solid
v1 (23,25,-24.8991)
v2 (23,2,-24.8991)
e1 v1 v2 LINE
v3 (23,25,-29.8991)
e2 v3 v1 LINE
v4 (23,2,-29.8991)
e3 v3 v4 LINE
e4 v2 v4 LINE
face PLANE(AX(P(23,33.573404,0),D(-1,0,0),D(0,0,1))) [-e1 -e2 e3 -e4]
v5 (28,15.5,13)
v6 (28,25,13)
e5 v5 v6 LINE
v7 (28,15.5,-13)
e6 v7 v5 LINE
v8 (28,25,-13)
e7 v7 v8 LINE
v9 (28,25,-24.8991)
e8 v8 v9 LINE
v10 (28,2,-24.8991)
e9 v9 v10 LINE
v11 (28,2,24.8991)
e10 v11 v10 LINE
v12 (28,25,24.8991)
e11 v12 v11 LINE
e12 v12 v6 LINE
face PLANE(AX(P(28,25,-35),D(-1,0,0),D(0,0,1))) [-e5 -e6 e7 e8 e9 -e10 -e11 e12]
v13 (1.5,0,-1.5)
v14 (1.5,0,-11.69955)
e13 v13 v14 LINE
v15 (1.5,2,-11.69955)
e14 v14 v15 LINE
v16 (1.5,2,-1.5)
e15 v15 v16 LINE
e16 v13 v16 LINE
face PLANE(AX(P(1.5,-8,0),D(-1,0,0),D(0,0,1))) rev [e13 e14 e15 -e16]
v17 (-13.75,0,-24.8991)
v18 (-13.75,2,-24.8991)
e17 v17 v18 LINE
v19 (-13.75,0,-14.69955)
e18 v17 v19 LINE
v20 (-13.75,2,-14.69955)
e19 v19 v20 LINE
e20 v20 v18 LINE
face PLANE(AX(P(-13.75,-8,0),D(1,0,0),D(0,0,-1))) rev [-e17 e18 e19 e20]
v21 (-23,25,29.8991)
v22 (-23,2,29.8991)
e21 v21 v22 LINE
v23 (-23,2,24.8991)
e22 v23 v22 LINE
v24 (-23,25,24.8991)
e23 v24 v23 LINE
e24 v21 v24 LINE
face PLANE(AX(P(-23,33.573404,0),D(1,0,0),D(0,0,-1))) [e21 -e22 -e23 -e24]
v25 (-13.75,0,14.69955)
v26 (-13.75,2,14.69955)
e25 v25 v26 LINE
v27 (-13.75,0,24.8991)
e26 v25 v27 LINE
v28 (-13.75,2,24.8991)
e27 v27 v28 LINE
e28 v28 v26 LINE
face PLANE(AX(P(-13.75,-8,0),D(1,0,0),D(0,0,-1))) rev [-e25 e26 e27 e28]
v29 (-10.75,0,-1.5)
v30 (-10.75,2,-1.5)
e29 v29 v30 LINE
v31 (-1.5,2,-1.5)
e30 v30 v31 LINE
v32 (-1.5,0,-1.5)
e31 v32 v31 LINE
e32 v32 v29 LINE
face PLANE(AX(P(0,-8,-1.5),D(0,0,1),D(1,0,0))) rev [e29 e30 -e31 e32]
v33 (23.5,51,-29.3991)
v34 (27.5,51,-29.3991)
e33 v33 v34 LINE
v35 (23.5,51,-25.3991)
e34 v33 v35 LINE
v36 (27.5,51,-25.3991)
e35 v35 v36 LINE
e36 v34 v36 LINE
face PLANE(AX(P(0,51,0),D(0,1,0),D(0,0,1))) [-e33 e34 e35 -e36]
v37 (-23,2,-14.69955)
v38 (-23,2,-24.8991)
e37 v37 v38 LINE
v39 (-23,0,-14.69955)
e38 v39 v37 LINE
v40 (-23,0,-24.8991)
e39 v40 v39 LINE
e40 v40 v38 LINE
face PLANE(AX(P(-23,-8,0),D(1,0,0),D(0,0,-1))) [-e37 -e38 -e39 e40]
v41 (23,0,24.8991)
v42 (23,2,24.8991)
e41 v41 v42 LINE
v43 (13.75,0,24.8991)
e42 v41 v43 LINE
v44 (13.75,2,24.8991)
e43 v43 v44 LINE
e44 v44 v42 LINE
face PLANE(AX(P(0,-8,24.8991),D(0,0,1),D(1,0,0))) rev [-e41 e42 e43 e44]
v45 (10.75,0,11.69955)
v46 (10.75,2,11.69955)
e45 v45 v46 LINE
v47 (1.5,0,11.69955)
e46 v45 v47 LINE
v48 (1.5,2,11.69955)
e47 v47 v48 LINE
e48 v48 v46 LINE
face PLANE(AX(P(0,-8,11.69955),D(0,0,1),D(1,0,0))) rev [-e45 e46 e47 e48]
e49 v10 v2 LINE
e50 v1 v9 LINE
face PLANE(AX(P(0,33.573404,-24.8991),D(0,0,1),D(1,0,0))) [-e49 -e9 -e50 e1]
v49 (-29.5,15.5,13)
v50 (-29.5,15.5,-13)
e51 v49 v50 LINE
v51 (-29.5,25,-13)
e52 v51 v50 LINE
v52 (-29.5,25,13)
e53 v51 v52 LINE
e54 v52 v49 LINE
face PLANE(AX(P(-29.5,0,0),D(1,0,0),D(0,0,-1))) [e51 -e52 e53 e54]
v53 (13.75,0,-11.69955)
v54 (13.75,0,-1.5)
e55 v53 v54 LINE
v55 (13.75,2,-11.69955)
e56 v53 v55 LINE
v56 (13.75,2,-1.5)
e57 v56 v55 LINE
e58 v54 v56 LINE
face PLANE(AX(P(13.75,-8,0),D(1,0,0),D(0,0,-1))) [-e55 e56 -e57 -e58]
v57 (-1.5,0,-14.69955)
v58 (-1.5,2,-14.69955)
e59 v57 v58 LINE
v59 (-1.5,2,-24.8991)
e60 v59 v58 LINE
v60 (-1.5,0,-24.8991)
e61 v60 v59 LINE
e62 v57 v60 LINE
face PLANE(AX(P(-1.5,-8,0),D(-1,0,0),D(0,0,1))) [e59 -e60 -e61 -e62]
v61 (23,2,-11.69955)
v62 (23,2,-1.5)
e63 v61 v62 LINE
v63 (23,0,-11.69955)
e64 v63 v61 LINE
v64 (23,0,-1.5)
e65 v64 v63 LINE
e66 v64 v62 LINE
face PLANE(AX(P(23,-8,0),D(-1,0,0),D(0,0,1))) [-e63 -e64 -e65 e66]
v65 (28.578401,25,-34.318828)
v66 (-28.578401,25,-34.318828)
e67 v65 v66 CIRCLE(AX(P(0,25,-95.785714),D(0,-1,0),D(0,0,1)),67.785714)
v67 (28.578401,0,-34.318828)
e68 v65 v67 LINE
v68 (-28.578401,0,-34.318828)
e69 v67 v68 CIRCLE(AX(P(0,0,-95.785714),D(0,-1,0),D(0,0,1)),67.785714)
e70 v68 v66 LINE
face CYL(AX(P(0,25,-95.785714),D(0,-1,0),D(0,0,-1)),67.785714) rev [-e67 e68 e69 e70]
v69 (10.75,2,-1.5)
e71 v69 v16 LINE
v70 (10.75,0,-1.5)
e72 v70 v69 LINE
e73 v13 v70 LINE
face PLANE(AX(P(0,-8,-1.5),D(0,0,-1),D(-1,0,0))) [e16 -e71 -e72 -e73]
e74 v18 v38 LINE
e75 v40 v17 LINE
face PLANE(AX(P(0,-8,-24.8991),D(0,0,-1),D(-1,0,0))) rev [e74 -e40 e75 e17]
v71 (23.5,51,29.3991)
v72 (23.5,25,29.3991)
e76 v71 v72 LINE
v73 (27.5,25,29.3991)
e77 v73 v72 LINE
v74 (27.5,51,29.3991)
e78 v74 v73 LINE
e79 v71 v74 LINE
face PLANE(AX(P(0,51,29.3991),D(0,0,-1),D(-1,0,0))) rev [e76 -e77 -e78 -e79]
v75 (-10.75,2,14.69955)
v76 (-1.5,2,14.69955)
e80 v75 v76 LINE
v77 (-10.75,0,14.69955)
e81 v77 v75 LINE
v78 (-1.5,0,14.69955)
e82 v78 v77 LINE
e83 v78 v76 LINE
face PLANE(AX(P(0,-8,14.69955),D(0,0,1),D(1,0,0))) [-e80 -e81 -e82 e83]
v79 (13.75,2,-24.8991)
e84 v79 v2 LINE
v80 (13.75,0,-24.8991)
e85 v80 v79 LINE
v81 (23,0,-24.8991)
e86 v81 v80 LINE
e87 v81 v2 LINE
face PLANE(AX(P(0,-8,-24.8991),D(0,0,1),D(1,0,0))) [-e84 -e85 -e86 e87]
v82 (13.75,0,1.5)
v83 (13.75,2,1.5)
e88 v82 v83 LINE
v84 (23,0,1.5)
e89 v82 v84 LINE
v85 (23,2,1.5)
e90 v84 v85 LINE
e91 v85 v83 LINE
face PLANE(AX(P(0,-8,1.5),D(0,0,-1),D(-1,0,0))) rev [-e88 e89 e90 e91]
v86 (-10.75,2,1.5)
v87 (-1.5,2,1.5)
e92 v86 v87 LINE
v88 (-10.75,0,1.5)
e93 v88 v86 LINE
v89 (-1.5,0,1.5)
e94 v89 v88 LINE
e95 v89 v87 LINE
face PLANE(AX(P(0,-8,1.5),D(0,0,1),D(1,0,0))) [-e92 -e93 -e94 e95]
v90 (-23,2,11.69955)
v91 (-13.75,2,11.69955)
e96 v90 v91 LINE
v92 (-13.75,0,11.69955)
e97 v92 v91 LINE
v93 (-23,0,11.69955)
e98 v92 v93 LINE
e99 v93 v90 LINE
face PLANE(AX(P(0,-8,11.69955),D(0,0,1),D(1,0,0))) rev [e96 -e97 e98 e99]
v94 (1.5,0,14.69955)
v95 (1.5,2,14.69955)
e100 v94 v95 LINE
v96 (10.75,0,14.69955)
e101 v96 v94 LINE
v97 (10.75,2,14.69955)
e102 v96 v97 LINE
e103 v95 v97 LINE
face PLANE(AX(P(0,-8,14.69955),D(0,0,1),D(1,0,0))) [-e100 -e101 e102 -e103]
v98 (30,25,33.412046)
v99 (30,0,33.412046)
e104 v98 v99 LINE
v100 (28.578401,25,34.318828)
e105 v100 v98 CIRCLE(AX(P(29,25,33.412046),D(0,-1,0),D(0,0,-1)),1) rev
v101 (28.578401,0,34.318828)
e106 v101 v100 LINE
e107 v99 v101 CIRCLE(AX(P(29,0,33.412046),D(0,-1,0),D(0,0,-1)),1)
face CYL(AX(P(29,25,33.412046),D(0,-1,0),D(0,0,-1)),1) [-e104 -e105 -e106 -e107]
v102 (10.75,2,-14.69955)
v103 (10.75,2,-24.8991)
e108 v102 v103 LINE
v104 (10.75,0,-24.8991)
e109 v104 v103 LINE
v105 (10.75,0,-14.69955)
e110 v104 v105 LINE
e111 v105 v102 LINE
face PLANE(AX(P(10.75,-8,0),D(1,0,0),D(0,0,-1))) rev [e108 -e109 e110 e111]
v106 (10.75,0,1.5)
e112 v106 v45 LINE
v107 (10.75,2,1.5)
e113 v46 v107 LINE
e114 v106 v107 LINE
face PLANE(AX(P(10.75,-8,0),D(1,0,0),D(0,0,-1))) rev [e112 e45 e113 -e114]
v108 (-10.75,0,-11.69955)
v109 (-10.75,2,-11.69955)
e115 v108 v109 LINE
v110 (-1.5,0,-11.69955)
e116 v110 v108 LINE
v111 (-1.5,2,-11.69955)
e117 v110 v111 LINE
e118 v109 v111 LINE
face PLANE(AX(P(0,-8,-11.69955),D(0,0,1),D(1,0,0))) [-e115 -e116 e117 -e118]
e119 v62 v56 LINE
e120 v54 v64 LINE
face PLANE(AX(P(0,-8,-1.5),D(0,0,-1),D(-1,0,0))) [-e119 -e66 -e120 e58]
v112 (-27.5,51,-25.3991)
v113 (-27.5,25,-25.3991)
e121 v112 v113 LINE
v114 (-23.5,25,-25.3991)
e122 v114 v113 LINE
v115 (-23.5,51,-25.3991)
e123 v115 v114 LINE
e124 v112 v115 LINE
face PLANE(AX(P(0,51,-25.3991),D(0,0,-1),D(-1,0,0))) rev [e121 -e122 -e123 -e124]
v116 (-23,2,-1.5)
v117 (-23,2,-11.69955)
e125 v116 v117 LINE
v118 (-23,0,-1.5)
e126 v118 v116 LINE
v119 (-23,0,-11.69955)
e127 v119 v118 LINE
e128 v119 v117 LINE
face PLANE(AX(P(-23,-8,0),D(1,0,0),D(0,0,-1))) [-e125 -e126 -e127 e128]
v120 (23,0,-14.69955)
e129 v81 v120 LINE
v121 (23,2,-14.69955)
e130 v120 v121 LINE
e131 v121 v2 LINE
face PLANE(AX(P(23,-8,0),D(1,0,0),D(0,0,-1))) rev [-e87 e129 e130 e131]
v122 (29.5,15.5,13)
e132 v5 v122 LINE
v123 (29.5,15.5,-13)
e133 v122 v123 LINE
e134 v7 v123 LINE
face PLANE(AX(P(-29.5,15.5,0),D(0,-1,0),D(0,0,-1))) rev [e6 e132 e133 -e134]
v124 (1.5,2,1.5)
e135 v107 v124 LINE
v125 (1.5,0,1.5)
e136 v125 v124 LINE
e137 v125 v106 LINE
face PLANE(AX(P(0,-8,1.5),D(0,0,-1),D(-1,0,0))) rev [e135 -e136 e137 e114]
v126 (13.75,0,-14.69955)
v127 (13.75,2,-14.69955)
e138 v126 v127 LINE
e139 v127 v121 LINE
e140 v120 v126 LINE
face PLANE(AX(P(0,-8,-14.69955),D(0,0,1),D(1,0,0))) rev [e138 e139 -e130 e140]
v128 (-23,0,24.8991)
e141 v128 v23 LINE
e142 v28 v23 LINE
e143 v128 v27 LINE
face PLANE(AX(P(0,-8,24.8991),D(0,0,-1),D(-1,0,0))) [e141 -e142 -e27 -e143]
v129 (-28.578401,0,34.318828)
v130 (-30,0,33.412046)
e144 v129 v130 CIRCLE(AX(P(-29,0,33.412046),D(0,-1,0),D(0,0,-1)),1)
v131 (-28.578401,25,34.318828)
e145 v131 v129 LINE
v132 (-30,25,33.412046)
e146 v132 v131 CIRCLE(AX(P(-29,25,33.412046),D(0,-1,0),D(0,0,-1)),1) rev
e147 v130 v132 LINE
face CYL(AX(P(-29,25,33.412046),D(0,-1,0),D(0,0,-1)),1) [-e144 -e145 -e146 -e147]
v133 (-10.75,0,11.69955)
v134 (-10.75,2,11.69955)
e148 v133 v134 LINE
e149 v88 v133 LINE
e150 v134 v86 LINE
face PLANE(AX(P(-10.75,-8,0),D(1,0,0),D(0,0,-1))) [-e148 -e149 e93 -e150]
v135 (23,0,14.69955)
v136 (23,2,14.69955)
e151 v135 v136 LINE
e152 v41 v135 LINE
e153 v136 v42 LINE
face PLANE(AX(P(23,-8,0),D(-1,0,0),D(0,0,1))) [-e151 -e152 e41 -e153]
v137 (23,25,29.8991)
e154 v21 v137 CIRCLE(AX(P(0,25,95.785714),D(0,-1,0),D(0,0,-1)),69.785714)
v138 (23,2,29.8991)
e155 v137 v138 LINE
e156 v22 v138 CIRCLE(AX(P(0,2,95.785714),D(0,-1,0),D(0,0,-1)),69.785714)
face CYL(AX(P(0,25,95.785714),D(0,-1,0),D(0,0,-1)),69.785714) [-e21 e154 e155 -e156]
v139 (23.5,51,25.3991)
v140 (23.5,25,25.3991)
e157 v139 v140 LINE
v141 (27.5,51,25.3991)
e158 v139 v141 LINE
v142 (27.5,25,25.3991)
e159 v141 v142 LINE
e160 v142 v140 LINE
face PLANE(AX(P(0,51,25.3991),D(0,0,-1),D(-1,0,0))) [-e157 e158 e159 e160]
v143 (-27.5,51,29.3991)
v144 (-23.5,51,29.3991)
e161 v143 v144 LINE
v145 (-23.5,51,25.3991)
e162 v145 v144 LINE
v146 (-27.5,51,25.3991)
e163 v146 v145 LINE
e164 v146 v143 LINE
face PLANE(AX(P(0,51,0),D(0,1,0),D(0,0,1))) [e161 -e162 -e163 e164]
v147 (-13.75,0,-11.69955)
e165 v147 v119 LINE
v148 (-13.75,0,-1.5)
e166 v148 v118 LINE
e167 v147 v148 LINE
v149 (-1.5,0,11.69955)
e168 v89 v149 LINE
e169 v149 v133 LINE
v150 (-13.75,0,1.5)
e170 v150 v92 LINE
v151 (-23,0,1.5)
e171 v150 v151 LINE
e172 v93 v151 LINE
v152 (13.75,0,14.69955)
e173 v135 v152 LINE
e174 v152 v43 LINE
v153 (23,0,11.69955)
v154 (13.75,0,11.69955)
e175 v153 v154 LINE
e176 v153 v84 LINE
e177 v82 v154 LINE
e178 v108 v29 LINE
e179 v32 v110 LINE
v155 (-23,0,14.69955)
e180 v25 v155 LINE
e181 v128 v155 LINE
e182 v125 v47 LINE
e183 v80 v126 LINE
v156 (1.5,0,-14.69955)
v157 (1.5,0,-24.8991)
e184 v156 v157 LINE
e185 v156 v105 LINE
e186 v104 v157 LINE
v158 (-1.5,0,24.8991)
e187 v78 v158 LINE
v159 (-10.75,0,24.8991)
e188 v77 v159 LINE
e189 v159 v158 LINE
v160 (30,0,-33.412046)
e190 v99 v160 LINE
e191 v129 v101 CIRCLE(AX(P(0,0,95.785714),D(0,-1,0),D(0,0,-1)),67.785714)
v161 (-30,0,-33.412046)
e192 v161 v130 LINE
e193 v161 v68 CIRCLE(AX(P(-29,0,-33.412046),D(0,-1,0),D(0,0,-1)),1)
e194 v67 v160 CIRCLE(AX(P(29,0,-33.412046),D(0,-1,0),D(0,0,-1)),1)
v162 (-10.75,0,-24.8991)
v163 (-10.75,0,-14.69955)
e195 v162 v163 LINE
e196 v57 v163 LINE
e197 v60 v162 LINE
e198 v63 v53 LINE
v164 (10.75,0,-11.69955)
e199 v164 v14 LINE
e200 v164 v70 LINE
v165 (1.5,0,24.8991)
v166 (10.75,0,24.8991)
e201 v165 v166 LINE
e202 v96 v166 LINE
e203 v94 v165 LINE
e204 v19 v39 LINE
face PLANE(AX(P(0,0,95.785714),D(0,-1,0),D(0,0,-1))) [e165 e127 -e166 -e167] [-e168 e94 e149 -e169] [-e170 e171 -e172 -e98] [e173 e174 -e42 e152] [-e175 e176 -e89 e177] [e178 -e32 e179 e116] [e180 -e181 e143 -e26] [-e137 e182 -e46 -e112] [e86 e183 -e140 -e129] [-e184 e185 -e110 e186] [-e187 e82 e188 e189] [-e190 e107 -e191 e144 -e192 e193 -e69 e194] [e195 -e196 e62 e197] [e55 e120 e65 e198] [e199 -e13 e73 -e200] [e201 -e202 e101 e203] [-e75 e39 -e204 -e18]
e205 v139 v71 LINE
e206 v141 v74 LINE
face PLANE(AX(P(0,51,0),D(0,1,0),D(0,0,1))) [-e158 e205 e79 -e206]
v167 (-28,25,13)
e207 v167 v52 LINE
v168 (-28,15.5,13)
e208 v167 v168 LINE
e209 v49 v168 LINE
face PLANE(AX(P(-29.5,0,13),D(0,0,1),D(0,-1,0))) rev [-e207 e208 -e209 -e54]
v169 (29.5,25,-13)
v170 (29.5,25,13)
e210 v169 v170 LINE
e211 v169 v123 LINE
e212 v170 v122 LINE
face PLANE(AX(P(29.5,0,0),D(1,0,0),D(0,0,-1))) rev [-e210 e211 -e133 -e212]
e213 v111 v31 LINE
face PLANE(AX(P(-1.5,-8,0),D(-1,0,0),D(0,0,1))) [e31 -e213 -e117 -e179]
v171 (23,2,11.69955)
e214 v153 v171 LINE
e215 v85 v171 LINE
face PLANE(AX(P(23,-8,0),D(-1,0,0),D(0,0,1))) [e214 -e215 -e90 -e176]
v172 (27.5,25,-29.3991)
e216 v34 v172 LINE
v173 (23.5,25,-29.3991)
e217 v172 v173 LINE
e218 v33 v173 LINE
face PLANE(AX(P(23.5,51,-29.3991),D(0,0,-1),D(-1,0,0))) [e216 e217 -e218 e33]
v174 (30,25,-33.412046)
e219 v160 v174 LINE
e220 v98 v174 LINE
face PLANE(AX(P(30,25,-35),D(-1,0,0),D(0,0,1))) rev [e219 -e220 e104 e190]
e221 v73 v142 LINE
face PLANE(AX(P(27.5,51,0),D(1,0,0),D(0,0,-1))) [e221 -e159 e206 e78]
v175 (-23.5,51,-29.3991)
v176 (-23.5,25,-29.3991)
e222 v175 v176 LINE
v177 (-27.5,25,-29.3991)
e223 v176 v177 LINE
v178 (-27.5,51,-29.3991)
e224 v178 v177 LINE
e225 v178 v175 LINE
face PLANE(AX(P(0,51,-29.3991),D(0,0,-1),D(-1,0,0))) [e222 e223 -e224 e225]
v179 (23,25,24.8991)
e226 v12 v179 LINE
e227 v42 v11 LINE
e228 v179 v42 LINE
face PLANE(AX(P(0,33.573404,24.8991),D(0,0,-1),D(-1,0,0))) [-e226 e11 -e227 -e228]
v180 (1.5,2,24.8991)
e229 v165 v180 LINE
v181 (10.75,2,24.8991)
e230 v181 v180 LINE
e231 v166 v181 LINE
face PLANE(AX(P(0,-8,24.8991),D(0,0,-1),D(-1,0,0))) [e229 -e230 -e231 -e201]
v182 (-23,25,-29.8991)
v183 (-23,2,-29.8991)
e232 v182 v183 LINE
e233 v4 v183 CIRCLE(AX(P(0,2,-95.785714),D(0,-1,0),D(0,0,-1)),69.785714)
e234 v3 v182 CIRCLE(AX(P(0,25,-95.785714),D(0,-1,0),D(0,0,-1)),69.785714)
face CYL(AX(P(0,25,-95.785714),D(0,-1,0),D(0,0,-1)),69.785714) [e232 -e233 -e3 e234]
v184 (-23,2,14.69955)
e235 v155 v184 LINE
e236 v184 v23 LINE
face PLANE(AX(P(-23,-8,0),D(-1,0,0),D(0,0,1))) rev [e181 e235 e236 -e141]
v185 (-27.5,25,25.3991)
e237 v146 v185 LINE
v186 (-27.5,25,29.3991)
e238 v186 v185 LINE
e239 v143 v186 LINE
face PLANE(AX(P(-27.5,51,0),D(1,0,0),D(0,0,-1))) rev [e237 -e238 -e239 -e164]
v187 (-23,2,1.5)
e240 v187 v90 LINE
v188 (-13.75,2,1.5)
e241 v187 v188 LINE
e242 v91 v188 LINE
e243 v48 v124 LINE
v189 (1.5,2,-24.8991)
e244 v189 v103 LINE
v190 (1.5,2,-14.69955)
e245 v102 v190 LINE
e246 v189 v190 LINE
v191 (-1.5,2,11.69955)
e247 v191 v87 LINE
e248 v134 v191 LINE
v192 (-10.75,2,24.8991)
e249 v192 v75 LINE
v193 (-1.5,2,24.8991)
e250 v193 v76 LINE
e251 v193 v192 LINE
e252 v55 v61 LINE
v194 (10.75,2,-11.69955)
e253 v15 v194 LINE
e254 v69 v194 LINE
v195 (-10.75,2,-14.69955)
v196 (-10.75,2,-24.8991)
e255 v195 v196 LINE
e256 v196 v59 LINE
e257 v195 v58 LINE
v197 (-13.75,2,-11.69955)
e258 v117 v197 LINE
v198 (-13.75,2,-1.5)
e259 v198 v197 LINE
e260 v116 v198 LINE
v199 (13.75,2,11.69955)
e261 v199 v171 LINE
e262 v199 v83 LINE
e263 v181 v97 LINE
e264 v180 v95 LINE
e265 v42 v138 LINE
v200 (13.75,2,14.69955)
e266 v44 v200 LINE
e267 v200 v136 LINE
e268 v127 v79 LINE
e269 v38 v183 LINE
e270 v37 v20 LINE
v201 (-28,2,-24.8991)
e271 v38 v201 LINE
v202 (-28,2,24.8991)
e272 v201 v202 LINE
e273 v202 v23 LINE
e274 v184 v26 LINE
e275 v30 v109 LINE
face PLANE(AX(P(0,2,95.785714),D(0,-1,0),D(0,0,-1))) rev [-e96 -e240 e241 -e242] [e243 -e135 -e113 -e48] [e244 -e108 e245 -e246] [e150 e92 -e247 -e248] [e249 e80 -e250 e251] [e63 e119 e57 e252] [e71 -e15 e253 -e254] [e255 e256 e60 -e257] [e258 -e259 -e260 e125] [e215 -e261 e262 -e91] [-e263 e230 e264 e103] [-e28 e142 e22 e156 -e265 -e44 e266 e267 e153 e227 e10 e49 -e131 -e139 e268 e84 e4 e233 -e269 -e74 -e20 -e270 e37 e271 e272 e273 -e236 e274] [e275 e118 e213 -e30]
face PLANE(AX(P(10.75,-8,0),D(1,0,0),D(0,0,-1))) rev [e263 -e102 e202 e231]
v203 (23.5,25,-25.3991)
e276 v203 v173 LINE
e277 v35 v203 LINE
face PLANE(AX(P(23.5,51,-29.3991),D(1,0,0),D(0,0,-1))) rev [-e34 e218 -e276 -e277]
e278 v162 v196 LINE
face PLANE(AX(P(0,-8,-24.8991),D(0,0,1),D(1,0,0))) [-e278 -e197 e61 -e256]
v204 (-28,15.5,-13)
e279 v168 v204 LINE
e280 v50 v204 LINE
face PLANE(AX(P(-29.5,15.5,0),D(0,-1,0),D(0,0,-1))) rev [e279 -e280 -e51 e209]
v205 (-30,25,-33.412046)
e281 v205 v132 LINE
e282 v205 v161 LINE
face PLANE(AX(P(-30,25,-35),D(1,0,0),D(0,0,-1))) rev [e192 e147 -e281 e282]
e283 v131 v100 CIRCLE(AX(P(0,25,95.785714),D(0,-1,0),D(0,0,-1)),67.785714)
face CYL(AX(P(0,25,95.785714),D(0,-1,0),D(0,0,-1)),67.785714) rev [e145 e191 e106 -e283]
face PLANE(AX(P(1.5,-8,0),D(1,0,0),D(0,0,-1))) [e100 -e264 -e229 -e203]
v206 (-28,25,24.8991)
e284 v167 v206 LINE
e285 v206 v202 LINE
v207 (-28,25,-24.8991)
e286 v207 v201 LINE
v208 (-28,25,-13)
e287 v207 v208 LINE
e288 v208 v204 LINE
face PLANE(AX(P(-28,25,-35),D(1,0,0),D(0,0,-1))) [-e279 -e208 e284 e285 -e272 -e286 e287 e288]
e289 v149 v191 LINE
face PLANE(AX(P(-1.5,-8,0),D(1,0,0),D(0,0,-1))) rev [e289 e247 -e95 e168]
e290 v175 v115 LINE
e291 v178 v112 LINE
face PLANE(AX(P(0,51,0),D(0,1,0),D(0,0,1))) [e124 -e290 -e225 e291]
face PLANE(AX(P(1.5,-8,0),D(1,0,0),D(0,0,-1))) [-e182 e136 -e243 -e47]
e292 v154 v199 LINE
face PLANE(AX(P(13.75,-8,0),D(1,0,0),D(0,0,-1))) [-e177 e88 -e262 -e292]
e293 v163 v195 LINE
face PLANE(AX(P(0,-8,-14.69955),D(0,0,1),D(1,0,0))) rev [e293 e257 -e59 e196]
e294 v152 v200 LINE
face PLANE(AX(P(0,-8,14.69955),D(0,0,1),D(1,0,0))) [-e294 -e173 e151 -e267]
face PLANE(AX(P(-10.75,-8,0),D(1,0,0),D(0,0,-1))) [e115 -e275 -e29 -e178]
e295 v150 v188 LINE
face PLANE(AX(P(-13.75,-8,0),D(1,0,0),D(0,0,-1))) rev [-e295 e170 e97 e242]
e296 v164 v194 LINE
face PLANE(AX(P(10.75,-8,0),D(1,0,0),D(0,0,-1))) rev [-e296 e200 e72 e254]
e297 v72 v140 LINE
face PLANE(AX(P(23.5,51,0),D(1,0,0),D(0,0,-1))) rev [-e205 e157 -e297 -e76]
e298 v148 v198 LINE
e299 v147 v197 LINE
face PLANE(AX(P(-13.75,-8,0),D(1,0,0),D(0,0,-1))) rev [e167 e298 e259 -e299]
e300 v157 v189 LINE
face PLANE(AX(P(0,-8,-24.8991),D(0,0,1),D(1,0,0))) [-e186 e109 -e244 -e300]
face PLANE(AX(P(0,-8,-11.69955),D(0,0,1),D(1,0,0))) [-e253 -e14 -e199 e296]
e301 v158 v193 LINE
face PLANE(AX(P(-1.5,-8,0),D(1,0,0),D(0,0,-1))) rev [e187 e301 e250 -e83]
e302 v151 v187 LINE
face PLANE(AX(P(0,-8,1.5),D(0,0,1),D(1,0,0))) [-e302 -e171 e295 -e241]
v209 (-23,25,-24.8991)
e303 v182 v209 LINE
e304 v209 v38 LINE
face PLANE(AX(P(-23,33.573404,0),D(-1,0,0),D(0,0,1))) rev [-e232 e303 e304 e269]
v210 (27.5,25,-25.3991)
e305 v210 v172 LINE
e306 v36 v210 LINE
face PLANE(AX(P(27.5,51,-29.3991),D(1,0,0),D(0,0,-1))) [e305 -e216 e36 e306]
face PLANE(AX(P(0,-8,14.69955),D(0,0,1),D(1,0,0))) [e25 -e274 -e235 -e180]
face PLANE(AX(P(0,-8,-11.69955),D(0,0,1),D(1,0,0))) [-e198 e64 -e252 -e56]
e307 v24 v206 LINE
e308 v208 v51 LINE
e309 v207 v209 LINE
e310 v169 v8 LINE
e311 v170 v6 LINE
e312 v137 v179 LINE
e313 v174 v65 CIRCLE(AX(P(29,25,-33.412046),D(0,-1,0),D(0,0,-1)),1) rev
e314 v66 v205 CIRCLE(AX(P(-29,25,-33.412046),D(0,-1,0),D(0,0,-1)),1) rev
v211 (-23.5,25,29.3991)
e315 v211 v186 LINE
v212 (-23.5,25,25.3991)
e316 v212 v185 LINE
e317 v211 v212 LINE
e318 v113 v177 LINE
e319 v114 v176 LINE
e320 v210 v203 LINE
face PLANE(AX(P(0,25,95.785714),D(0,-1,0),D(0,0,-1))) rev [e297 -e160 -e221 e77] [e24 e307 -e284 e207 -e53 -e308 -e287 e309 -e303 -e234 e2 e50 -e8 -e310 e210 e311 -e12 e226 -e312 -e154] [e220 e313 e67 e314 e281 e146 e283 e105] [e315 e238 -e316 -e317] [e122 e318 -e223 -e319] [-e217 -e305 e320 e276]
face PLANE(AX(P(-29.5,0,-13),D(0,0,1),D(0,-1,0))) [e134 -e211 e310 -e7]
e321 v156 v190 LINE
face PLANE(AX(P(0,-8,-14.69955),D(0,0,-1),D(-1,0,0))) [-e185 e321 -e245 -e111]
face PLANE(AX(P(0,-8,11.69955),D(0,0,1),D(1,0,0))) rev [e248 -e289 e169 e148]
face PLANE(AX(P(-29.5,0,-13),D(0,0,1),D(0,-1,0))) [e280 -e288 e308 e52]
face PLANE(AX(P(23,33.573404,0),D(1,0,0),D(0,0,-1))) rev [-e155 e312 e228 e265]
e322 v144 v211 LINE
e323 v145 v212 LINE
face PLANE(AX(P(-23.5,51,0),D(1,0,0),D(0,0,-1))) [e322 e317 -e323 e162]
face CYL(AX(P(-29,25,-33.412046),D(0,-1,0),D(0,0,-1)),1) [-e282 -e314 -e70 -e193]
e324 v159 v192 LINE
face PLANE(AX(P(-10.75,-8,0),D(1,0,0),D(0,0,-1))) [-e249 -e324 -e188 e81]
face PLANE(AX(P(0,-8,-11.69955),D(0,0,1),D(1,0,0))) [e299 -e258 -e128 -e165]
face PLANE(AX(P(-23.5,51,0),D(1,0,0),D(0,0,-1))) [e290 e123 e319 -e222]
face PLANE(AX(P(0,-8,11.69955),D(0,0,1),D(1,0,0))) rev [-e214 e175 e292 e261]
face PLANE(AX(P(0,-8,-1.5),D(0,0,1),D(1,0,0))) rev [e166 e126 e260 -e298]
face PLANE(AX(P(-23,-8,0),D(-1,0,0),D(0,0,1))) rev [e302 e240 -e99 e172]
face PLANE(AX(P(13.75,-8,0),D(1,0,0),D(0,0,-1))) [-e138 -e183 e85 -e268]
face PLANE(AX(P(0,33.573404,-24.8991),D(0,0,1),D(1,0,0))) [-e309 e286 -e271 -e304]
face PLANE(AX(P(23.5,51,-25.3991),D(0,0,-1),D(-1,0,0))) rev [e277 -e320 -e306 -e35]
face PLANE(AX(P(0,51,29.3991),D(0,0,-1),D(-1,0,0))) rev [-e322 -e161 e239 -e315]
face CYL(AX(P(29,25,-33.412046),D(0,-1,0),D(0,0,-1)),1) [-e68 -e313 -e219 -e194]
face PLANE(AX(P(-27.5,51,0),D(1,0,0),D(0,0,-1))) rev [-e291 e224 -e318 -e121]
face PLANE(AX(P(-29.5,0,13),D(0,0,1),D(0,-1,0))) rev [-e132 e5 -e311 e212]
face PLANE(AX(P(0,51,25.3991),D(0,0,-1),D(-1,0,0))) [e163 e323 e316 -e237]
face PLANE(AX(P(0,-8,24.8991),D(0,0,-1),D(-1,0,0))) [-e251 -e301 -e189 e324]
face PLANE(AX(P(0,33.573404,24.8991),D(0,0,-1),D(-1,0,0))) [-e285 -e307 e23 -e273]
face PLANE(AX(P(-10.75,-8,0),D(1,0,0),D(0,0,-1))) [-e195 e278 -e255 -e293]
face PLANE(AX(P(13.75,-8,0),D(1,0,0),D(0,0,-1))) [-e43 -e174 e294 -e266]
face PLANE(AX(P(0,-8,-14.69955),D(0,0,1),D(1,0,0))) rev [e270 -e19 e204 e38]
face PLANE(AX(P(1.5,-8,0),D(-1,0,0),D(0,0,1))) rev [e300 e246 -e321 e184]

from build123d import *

# Parameters (mm, degrees)
RESSALTO_EXTRUS_O1_DEPTH = 25
CASCA1_T                 = -2
ESBO_O3_W                = 4
ESBO_O3_H                = 4
RESSALTO_EXTRUS_O2_DEPTH = 23
ESBO_O3_3_W              = 4
ESBO_O3_3_H              = 4
RESSALTO_EXTRUS_O3_DEPTH = 49
FILETE1_R                = 1
CORTE_EXTRUS_O1_START    = -0.5
ESBO_O4_W                = 26
ESBO_O4_H                = 9.5
ESBO_O4_H_2              = 3.5
CORTE_EXTRUS_O1_DEPTH    = 59
ESBO_O5_W                = 9.25
ESBO_O5_H                = 10.19955009
CORTE_EXTRUS_O2_DEPTH    = 10


with BuildPart() as part:
    # Esboço2 → Ressalto-extrusão1 (new body)
    with BuildSketch(Plane(origin=(0, 0, 0), x_dir=(1, 0, 0), z_dir=(0, 1, 0))):
        with BuildLine():
            Line((-30, 35), (-30, -35))
            ThreePointArc((-30, -35), (0, -28), (30, -35))
            Line((30, -35), (30, 35))
            ThreePointArc((30, 35), (0, 28), (-30, 35))
        make_face()
    extrude(amount=RESSALTO_EXTRUS_O1_DEPTH)

    # Casca1
    casca1_openings = [part.faces().sort_by_distance(p)[0] for p in [
        (0, 25, 0),
    ]]
    offset(amount=CASCA1_T, openings=casca1_openings, kind=Kind.INTERSECTION)

    # Esboço3 → Ressalto-extrusão2 (add)
    # profile 1 of 4: a face of its own
    with BuildSketch(Plane(origin=(0, 2, 0), x_dir=(1, 0, 0), z_dir=(0, 1, 0))):
        with BuildLine():
            Line((23, 24.89910018), (28, 24.89910018))
            Line((28, 24.89910018), (28, 31.863527853))
            ThreePointArc((28, 31.863527853), (25.518909538, 30.833184124), (23, 29.89910018))
            Line((23, 29.89910018), (23, 24.89910018))
        make_face()
        with Locations((25.5, 27.39910018)):
            Rectangle(ESBO_O3_W, ESBO_O3_H, mode=Mode.SUBTRACT)
    # profile 2 of 4: a face of its own
    with BuildSketch(Plane(origin=(0, 2, 0), x_dir=(1, 0, 0), z_dir=(0, 1, 0))):
        with BuildLine():
            Line((28, -31.863527853), (28, -24.89910018))
            Line((28, -24.89910018), (23, -24.89910018))
            Line((23, -24.89910018), (23, -29.89910018))
            ThreePointArc((23, -29.89910018), (25.518909538, -30.833184124), (28, -31.863527853))
        make_face()
        with Locations((25.5, -27.39910018)):
            Rectangle(ESBO_O3_W, ESBO_O3_H, mode=Mode.SUBTRACT)
    # profile 3 of 4: a face of its own
    with BuildSketch(Plane(origin=(0, 2, 0), x_dir=(1, 0, 0), z_dir=(0, 1, 0))):
        with BuildLine():
            Line((-23, 24.89910018), (-23, 29.89910018))
            ThreePointArc((-23, 29.89910018), (-25.518909538, 30.833184124), (-28, 31.863527853))
            Line((-28, 31.863527853), (-28, 24.89910018))
            Line((-28, 24.89910018), (-23, 24.89910018))
        make_face()
        with Locations((-25.5, 27.39910018)):
            Rectangle(ESBO_O3_W, ESBO_O3_H, mode=Mode.SUBTRACT)
    # profile 4 of 4: a face of its own
    with BuildSketch(Plane(origin=(0, 2, 0), x_dir=(1, 0, 0), z_dir=(0, 1, 0))):
        with BuildLine():
            ThreePointArc((-28, -31.863527853), (-25.518909538, -30.833184124), (-23, -29.89910018))
            Line((-23, -29.89910018), (-23, -24.89910018))
            Line((-23, -24.89910018), (-28, -24.89910018))
            Line((-28, -24.89910018), (-28, -31.863527853))
        make_face()
        with Locations((-25.5, -27.39910018)):
            Rectangle(ESBO_O3_W, ESBO_O3_H, mode=Mode.SUBTRACT)
    extrude(amount=RESSALTO_EXTRUS_O2_DEPTH)

    # Esboço3<3> → Ressalto-extrusão3 (add)
    with BuildSketch(Plane(origin=(0, 2, 0), x_dir=(1, 0, 0), z_dir=(0, 1, 0))):
        with Locations((25.5, 27.39910018)):
            Rectangle(ESBO_O3_3_W, ESBO_O3_3_H)
        with Locations((25.5, -27.39910018)):
            Rectangle(ESBO_O3_3_W, ESBO_O3_3_H)
        with Locations((-25.5, 27.39910018)):
            Rectangle(ESBO_O3_3_W, ESBO_O3_3_H)
        with Locations((-25.5, -27.39910018)):
            Rectangle(ESBO_O3_3_W, ESBO_O3_3_H)
    extrude(amount=RESSALTO_EXTRUS_O3_DEPTH)

    # Filete1
    filete1_edges = [part.edges().sort_by_distance(p)[0] for p in [
        (-30, 12.5, 35),
        (-30, 12.5, -35),
        (30, 12.5, -35),
        (30, 12.5, 35),
    ]]
    fillet(filete1_edges, radius=FILETE1_R)

    # Esboço4 → Corte-extrusão1 (cut)
    with BuildSketch(Plane(origin=(30, 0, 0), x_dir=(0, 0, -1), z_dir=(1, 0, 0)).offset(CORTE_EXTRUS_O1_START)):
        with Locations((0, 20.25)):
            Rectangle(ESBO_O4_W, ESBO_O4_H)
        with Locations((0, 26.75)):
            Rectangle(ESBO_O4_W, ESBO_O4_H_2)
    extrude(amount=-CORTE_EXTRUS_O1_DEPTH, mode=Mode.SUBTRACT)

    # Esboço5 → Corte-extrusão2 (cut)
    with BuildSketch(Plane(origin=(0, 2, 0), x_dir=(1, 0, 0), z_dir=(0, 1, 0))):
        with Locations((-18.375, 19.799325135)):
            Rectangle(ESBO_O5_W, ESBO_O5_H)
        Polygon((-13.75, 4.5), (-13.75, 11.69955009), (-23, 11.69955009), (-23, 4.5), (-23, 1.5), (-13.75, 1.5), align=None)
        with Locations((-6.125, 6.599775045)):
            Rectangle(ESBO_O5_W, ESBO_O5_H)
        Polygon((-10.75, 24.89910018), (-10.75, 14.69955009), (-4.5, 14.69955009), (-1.5, 14.69955009), (-1.5, 24.89910018), (-4.5, 24.89910018), align=None)
        Polygon((-23, -11.69955009), (-13.75, -11.69955009), (-13.75, -4.5), (-13.75, -1.5), (-23, -1.5), (-23, -4.5), align=None)
        with Locations((-6.125, -6.599775045)):
            Rectangle(ESBO_O5_W, ESBO_O5_H)
        with Locations((-18.375, -19.799325135)):
            Rectangle(ESBO_O5_W, ESBO_O5_H)
        Polygon((-1.5, -14.69955009), (-4.5, -14.69955009), (-10.75, -14.69955009), (-10.75, -24.89910018), (-4.5, -24.89910018), (-1.5, -24.89910018), align=None)
        Polygon((10.75, -14.69955009), (1.5, -14.69955009), (1.5, -24.89910018), (4.5, -24.89910018), (10.75, -24.89910018), align=None)
        with Locations((18.375, -19.799325135)):
            Rectangle(ESBO_O5_W, ESBO_O5_H)
        Polygon((13.75, -1.5), (13.75, -11.69955009), (23, -11.69955009), (23, -4.5), (23, -1.5), align=None)
        with Locations((6.125, -6.599775045)):
            Rectangle(ESBO_O5_W, ESBO_O5_H)
        with Locations((6.125, 6.599775045)):
            Rectangle(ESBO_O5_W, ESBO_O5_H)
        Polygon((13.75, 11.69955009), (13.75, 1.5), (23, 1.5), (23, 4.5), (23, 11.69955009), align=None)
        with Locations((18.375, 19.799325135)):
            Rectangle(ESBO_O5_W, ESBO_O5_H)
        Polygon((4.5, 14.69955009), (10.75, 14.69955009), (10.75, 24.89910018), (4.5, 24.89910018), (1.5, 24.89910018), (1.5, 14.69955009), align=None)
    extrude(amount=-CORTE_EXTRUS_O2_DEPTH, mode=Mode.SUBTRACT)


solid = part.part
